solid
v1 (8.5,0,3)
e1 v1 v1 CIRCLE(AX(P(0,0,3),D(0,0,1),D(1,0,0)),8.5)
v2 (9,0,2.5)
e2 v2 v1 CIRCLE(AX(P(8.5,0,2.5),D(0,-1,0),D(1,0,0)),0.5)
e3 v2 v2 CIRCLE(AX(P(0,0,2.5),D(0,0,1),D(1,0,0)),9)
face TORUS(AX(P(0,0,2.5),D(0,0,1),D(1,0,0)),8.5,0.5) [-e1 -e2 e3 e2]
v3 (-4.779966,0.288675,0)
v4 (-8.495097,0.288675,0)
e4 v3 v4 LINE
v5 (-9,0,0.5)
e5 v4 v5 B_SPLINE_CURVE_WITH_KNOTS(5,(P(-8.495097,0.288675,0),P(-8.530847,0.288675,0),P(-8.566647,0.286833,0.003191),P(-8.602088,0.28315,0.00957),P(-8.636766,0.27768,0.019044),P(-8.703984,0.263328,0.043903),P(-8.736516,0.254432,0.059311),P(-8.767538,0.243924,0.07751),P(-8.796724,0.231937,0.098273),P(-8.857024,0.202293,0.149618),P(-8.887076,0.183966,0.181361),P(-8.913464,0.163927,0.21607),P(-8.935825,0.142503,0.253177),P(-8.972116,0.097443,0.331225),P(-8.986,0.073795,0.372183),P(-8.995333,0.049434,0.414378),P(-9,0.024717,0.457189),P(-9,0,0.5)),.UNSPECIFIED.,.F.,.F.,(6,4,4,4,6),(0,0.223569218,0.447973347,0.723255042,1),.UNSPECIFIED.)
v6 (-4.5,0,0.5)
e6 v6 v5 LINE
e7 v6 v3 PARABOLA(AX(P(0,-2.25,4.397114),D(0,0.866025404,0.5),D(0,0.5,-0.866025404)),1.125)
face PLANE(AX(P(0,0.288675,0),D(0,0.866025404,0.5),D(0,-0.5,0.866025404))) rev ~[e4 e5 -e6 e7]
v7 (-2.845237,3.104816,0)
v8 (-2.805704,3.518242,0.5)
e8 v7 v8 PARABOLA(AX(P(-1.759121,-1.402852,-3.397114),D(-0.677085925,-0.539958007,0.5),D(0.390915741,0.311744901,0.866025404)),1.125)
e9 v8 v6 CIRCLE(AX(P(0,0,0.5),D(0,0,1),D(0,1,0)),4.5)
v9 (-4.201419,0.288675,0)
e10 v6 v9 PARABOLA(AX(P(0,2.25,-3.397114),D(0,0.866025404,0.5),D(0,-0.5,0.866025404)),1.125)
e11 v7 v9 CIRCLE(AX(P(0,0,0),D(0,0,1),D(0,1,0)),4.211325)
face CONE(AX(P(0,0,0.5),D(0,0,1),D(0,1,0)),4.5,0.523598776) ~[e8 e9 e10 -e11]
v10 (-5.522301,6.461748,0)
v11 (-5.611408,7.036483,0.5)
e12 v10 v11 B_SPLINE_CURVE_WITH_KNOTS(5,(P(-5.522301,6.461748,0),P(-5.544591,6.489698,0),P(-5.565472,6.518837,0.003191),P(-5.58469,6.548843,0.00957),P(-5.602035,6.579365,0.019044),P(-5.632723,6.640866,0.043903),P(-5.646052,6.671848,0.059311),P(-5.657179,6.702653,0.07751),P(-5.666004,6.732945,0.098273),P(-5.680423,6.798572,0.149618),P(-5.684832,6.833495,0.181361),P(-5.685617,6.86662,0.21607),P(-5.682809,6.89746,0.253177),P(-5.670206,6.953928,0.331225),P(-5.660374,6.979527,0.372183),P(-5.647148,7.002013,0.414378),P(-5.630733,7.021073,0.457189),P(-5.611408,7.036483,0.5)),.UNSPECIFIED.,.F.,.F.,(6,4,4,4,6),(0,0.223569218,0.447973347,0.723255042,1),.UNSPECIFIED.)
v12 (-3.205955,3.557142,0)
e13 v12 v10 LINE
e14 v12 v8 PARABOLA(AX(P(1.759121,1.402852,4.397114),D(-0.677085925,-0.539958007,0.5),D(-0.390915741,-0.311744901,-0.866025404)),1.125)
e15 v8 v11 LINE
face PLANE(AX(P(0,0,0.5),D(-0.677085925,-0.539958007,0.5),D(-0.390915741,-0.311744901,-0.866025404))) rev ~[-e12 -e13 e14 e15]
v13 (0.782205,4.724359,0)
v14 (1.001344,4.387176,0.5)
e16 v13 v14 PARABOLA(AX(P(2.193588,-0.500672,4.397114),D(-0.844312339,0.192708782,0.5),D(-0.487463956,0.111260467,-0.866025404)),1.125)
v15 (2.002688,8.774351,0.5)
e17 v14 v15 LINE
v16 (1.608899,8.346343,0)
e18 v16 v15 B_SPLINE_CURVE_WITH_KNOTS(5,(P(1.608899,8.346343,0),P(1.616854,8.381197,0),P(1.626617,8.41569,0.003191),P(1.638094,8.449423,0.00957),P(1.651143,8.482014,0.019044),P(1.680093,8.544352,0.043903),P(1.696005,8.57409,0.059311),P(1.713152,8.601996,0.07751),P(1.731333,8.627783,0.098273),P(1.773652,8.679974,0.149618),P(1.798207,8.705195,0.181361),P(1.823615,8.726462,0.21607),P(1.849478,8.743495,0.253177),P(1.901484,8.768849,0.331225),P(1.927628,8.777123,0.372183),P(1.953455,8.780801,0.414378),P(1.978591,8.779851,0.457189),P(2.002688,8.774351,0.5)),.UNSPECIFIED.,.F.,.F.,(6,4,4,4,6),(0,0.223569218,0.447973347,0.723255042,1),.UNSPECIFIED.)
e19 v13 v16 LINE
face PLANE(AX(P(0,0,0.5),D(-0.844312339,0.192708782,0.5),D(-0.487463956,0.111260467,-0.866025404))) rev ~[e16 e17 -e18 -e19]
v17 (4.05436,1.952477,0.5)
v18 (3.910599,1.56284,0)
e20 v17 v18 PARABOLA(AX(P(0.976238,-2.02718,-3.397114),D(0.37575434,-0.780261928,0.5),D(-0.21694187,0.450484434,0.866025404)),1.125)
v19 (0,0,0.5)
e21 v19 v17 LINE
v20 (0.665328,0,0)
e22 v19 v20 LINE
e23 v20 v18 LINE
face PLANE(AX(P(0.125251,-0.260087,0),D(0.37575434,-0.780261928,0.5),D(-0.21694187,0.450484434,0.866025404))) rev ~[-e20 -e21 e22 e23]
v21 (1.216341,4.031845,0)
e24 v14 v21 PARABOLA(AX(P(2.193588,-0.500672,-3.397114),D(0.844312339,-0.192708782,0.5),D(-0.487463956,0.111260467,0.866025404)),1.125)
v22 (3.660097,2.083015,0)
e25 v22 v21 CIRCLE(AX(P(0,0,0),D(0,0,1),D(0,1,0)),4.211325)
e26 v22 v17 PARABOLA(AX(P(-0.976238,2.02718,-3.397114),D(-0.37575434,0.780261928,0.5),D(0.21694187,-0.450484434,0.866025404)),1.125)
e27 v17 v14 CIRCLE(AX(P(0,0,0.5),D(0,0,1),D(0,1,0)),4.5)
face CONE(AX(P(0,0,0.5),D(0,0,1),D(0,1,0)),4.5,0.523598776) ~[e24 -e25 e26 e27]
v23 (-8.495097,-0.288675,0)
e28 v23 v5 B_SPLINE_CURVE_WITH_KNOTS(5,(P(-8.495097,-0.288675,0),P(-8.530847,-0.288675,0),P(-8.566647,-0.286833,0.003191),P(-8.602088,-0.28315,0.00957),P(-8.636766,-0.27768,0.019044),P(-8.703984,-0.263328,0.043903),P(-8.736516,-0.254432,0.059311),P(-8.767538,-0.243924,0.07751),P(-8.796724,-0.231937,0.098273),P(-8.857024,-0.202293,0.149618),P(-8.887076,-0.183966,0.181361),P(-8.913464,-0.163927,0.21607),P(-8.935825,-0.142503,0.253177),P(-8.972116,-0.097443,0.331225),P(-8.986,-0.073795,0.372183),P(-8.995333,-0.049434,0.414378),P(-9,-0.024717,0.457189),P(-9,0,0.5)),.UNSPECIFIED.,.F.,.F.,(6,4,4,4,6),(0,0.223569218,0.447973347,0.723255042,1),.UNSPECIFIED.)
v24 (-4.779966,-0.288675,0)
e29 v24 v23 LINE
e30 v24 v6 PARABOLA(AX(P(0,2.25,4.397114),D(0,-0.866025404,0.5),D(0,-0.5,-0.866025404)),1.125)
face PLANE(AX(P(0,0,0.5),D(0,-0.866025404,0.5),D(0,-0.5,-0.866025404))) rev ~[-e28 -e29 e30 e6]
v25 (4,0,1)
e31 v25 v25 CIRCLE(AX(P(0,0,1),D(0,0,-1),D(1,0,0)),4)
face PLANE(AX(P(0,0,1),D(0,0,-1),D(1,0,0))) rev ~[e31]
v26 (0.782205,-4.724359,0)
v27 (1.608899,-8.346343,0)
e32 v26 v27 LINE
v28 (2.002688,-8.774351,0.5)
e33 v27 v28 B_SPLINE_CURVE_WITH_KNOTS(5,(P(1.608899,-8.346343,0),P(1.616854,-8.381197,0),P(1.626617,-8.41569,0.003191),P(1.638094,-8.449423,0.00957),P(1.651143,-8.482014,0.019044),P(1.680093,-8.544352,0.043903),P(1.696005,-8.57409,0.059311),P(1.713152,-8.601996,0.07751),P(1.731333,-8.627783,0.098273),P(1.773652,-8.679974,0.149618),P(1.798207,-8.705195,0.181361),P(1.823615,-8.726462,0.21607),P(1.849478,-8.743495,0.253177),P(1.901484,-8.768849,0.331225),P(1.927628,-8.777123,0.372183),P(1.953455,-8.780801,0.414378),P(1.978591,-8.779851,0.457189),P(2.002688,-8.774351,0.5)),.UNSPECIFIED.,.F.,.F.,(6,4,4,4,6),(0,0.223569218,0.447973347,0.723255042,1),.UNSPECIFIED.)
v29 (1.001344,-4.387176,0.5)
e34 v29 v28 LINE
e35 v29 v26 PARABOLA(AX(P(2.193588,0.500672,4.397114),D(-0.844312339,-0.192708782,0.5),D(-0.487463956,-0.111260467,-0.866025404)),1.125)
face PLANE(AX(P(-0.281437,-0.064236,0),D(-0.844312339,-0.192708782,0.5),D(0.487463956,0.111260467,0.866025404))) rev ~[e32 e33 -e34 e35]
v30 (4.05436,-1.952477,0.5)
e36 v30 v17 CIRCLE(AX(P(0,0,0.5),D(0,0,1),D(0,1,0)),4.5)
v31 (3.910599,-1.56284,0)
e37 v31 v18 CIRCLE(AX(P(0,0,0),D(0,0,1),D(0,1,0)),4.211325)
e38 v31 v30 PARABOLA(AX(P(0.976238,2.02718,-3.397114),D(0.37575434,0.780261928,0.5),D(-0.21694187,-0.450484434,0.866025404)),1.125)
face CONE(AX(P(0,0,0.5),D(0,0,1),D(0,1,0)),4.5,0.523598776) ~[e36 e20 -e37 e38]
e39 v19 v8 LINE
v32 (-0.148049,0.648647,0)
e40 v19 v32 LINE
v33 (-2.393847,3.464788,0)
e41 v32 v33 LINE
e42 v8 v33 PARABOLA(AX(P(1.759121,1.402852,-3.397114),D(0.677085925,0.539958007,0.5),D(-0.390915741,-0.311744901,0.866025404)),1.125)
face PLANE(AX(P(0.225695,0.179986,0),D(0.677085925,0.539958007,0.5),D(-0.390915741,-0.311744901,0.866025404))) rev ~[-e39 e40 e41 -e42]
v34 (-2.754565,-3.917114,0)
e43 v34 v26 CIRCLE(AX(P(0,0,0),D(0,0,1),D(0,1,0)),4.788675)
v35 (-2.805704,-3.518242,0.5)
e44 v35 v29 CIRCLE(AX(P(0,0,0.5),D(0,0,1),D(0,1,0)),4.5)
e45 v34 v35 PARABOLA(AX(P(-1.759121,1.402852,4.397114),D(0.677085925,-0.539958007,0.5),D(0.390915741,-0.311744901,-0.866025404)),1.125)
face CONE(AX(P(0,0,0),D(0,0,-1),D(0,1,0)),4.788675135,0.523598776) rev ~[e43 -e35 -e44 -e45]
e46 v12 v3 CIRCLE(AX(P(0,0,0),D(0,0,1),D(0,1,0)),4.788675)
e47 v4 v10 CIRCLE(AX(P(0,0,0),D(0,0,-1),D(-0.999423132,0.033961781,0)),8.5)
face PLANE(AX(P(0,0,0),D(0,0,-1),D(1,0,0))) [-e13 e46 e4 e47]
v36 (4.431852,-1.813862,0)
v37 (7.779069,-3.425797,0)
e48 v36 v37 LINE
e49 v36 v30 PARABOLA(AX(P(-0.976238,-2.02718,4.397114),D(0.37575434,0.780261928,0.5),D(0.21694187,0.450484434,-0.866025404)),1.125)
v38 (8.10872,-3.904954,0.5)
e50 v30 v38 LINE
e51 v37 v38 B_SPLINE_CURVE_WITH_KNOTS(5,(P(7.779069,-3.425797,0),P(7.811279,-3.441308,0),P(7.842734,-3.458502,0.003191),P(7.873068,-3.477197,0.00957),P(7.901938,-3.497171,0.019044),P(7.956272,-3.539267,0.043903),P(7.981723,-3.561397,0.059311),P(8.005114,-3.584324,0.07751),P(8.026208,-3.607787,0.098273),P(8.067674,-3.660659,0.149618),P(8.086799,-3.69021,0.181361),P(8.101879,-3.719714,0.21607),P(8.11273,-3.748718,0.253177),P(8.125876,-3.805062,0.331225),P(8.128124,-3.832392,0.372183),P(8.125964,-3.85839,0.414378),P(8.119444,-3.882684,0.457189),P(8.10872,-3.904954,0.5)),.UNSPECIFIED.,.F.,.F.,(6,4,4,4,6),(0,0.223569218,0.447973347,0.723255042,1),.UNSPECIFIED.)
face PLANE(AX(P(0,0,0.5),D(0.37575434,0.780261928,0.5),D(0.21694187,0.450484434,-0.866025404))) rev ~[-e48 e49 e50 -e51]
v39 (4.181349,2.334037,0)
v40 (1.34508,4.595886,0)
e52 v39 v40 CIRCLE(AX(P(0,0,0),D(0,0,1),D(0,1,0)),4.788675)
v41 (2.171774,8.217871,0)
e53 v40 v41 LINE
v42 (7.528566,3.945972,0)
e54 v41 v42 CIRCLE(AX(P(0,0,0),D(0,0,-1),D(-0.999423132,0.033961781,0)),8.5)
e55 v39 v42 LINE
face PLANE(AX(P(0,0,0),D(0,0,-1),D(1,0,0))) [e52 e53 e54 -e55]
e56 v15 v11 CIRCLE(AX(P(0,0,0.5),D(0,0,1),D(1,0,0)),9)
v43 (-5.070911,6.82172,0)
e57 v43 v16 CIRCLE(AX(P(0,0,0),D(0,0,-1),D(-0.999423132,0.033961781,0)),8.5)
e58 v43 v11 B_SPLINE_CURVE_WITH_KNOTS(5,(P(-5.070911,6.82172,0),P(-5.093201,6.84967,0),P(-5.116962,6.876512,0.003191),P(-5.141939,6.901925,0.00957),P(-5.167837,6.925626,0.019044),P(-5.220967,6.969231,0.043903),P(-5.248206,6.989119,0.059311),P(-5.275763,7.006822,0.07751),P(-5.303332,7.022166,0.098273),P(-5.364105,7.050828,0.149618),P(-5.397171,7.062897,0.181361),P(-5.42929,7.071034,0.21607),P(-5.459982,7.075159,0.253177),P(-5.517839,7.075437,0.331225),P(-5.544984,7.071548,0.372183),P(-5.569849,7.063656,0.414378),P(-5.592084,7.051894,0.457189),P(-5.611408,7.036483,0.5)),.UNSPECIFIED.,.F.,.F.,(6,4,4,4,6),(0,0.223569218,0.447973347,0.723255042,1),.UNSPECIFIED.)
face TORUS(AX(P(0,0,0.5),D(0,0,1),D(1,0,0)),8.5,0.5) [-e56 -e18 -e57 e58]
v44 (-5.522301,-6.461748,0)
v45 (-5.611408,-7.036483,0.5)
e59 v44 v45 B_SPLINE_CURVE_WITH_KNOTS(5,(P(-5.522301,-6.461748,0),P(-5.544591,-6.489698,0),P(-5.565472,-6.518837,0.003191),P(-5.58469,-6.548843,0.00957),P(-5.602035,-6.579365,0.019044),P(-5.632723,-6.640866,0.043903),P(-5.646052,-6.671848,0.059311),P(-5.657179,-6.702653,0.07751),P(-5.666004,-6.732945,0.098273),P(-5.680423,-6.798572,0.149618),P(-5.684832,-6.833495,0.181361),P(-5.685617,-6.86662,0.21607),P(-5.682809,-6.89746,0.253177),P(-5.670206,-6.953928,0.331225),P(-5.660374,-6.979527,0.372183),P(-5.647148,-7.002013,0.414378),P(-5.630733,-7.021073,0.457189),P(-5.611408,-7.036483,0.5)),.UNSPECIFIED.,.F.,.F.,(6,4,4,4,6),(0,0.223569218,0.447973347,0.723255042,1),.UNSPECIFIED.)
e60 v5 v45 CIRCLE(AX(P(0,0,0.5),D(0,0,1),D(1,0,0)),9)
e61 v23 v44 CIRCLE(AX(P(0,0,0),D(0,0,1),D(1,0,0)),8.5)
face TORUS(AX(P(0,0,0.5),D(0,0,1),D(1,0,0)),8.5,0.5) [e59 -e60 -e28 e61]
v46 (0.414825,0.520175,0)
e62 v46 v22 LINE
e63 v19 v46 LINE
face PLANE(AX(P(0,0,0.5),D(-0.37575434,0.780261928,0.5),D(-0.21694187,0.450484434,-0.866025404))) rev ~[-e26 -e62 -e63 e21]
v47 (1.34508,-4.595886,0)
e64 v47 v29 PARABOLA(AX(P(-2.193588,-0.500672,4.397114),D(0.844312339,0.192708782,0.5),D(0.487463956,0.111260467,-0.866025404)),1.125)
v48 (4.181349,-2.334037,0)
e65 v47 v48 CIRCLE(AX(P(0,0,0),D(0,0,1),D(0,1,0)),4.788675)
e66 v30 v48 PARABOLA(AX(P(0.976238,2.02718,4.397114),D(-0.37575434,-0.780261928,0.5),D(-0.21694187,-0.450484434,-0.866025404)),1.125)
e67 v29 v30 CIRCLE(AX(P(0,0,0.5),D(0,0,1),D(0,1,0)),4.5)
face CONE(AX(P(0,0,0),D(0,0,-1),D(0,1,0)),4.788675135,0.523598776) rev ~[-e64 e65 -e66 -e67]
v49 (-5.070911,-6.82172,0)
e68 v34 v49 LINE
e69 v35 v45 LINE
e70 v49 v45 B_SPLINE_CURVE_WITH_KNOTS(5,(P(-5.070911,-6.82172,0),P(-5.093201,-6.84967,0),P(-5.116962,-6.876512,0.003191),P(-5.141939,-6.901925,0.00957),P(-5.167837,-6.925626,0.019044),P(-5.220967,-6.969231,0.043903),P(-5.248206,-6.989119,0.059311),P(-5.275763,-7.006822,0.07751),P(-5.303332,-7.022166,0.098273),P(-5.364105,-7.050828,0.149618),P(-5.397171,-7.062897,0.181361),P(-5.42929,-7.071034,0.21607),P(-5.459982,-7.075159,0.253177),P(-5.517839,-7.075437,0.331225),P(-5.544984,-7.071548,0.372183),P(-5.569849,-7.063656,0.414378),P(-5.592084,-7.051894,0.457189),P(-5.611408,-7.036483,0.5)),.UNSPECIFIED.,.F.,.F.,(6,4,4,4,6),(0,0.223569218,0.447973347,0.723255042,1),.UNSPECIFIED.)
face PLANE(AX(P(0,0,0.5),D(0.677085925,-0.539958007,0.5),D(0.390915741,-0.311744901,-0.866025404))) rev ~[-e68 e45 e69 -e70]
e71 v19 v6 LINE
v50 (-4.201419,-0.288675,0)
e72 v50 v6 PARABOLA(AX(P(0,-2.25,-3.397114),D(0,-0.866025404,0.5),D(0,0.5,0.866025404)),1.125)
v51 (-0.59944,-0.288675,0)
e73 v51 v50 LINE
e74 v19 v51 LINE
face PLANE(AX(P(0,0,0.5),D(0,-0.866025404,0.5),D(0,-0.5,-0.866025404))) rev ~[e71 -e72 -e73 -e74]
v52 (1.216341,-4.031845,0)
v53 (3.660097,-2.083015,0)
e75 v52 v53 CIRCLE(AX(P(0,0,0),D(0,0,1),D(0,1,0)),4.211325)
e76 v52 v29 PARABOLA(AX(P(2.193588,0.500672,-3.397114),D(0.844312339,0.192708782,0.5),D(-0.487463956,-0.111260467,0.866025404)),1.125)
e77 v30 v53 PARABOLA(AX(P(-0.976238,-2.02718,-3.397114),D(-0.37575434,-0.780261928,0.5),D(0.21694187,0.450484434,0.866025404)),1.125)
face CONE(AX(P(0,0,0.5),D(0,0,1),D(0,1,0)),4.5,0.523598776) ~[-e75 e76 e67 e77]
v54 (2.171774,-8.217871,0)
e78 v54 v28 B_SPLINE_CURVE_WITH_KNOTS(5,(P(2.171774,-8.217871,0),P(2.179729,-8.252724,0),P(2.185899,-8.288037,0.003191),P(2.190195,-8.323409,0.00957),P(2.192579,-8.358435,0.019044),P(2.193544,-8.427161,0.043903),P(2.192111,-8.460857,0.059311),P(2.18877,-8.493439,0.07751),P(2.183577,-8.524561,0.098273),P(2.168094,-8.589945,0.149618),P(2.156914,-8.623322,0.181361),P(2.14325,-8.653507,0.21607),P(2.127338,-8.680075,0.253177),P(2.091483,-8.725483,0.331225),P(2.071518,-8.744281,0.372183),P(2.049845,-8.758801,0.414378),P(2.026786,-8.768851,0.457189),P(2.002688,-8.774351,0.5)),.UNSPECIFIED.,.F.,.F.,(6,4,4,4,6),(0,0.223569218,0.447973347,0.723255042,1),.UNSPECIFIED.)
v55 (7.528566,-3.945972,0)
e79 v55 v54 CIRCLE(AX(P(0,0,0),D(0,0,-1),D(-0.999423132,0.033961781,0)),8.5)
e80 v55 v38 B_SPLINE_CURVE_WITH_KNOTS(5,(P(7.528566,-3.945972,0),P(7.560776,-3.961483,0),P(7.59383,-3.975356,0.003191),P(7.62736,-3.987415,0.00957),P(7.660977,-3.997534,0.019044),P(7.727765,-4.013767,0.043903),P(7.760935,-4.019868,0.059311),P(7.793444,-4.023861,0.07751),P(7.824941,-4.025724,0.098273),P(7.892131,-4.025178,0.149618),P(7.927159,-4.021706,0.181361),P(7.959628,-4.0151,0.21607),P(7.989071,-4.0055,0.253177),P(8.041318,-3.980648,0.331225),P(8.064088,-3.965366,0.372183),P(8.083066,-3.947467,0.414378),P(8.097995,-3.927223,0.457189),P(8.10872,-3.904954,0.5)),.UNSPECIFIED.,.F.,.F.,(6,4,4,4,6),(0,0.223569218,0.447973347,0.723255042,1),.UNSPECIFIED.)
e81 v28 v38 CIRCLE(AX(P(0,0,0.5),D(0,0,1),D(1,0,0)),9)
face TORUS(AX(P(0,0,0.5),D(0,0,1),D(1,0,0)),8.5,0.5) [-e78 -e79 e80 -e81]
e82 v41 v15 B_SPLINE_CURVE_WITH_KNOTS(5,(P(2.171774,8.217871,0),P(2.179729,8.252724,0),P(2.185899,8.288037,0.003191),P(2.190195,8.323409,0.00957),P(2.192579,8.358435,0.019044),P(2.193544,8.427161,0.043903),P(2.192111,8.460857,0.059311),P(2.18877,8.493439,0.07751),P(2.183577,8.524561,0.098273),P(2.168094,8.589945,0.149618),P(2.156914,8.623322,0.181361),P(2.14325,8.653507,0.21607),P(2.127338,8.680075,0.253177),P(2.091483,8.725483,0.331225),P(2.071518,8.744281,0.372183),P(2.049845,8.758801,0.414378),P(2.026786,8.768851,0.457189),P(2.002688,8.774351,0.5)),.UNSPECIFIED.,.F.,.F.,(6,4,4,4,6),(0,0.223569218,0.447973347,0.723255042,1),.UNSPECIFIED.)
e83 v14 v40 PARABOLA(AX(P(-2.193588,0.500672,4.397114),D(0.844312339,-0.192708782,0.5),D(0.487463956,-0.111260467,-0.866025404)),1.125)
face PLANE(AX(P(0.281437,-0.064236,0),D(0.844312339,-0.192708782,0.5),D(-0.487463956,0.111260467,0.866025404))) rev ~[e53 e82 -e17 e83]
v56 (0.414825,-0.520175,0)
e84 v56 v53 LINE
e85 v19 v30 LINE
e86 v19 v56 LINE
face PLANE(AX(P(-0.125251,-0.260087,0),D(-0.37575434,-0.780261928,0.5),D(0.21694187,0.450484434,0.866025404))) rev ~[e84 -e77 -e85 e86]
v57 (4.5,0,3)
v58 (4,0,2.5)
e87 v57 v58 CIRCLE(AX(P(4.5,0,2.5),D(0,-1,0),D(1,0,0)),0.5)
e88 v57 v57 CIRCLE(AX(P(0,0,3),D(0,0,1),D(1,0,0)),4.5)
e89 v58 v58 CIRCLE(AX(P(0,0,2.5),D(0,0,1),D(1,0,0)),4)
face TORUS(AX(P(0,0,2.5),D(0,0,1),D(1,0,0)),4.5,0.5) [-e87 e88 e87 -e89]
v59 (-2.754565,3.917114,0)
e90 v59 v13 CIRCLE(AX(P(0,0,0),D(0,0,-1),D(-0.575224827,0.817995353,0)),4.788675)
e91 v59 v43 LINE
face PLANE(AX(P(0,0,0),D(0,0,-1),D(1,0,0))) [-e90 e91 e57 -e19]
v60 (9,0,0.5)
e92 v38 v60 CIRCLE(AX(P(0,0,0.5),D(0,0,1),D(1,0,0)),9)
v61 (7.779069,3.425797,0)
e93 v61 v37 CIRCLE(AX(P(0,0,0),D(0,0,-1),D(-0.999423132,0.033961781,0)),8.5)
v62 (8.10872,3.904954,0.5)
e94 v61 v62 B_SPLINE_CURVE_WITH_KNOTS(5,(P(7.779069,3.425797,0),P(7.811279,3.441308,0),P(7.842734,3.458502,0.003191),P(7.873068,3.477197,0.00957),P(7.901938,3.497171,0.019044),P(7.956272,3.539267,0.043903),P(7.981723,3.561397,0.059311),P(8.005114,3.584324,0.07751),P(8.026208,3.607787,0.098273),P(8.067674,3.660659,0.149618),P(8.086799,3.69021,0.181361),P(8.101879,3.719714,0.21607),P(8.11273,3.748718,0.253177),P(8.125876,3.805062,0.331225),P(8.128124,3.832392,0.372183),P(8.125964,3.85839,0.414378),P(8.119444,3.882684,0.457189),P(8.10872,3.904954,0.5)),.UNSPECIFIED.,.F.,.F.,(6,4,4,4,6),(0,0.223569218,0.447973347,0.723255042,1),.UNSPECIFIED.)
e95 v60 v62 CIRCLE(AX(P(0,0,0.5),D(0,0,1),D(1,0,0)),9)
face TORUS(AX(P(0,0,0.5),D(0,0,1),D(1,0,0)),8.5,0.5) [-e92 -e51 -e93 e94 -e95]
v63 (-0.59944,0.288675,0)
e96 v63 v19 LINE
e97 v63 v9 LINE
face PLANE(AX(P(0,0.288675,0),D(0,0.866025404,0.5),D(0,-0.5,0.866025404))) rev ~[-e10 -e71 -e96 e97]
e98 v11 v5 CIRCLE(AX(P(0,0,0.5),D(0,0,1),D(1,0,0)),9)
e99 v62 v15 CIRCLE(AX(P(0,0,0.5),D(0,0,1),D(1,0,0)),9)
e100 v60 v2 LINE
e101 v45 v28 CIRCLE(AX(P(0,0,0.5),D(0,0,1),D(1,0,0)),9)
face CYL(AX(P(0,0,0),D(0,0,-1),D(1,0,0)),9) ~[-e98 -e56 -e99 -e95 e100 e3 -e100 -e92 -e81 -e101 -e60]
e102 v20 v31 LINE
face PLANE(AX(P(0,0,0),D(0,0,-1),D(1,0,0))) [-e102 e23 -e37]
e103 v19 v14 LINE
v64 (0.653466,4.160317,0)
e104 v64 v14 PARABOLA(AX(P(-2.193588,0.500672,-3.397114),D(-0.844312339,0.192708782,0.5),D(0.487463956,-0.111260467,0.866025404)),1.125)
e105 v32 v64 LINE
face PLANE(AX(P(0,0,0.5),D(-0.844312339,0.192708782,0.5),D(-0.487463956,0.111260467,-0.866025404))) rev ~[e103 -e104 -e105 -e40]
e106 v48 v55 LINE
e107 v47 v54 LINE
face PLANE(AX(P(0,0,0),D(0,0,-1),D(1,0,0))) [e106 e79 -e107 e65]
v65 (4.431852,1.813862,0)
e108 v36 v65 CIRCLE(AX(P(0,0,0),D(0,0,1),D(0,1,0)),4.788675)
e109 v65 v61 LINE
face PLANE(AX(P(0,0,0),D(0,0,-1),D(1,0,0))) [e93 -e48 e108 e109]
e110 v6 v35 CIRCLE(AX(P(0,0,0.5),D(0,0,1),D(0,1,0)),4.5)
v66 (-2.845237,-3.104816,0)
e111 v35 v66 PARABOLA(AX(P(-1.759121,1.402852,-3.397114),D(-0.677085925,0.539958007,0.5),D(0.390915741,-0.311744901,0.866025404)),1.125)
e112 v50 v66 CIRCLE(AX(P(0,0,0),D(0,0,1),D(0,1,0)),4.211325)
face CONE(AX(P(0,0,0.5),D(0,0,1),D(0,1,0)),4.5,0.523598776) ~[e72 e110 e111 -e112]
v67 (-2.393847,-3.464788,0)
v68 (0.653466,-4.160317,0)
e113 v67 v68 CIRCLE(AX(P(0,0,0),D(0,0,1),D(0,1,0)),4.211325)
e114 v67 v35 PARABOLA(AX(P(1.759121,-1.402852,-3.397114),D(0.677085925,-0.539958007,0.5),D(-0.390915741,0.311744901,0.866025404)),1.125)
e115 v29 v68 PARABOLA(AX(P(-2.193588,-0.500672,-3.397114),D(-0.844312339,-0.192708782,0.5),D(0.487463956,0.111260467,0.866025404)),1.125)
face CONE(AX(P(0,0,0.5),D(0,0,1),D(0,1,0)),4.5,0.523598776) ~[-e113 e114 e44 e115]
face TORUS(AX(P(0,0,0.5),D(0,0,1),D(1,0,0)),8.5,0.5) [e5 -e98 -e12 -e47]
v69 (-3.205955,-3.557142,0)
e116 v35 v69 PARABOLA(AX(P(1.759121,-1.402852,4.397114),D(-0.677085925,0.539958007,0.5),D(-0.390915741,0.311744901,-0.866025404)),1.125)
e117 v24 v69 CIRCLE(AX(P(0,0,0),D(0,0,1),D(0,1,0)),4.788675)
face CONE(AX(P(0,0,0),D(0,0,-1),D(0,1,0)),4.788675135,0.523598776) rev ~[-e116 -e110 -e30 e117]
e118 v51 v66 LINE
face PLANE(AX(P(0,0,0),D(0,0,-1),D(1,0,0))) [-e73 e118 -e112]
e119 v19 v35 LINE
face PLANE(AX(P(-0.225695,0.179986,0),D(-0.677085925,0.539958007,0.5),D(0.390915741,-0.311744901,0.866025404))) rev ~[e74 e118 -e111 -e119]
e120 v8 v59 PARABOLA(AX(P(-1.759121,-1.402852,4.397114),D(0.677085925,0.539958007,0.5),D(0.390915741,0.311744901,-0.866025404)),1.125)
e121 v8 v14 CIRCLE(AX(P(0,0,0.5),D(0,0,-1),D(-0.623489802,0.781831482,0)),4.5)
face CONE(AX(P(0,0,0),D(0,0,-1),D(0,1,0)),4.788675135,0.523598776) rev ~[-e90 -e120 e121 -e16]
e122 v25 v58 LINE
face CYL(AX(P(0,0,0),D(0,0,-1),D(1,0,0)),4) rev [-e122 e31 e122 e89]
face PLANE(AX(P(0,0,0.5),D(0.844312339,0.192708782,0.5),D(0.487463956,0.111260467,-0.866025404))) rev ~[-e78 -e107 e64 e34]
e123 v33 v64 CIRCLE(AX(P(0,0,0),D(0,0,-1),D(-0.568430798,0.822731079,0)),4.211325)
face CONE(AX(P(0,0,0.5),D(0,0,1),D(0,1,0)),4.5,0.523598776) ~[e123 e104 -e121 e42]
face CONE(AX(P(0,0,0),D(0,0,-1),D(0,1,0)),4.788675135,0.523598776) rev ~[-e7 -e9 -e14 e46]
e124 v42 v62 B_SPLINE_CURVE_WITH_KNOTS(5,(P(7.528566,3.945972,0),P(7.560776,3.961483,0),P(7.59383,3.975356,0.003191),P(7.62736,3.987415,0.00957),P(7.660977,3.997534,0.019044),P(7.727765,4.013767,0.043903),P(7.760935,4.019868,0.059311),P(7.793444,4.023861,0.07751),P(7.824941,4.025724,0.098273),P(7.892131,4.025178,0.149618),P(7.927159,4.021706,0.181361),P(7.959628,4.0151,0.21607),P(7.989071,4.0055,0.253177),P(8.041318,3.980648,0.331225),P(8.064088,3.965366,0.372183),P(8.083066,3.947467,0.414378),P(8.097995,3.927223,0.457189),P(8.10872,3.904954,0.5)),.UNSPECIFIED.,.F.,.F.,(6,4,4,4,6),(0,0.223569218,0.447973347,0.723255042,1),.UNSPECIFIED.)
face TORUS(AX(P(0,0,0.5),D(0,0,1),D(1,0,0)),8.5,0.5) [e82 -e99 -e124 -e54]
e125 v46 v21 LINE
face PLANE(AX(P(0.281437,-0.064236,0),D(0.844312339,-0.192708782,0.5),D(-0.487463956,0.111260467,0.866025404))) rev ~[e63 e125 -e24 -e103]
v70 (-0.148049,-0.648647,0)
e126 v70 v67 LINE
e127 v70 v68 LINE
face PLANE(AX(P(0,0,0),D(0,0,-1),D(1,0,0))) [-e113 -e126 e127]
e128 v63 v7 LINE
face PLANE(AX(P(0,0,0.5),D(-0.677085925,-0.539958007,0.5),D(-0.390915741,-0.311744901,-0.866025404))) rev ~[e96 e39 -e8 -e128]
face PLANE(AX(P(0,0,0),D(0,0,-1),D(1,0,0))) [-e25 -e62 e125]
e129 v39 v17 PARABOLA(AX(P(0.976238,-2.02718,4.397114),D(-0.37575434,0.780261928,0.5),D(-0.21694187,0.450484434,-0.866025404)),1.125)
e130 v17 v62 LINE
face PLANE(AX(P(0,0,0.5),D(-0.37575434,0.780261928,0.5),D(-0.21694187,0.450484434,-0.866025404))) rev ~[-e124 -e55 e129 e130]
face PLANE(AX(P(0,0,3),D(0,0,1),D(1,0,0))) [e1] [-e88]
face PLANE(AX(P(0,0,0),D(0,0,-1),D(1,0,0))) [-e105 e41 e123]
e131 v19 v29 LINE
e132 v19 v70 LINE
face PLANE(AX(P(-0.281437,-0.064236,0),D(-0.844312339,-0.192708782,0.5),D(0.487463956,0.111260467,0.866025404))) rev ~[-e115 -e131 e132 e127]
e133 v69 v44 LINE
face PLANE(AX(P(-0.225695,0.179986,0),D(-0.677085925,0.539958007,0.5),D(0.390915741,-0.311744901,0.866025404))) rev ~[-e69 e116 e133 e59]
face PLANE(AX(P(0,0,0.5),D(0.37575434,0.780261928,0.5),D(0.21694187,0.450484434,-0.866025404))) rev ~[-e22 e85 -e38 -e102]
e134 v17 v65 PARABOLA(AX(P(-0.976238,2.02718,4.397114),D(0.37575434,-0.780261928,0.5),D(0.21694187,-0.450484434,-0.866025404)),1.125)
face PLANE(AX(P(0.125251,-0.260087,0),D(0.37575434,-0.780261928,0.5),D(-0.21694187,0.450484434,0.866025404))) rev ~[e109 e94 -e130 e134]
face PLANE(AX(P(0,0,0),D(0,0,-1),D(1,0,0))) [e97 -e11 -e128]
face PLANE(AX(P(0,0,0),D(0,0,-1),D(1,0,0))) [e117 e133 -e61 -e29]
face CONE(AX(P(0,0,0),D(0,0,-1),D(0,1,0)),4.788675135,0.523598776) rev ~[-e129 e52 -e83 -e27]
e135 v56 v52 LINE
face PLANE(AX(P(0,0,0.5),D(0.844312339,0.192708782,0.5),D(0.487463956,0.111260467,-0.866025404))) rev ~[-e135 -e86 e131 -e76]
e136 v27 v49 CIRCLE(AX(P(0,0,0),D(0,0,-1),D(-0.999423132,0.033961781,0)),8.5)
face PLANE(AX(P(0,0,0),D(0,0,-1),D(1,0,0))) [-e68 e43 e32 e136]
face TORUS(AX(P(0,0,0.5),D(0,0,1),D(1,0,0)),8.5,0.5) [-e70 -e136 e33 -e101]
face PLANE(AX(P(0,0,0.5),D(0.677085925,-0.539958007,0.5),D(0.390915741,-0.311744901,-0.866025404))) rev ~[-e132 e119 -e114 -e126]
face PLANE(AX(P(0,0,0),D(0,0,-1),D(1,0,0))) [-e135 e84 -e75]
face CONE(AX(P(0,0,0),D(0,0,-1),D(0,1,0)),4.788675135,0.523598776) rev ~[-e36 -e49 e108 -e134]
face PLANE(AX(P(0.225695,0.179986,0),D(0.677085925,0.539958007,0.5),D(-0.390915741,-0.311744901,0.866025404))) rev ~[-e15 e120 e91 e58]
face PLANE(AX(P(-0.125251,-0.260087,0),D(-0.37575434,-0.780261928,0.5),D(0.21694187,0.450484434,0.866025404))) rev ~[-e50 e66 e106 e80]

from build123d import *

# Parameters (mm, degrees)
F0_R            = 9
F0_R_2          = 4
F1_DEPTH        = 3
F2_R            = 4
F3_DEPTH        = 1
F4_R            = 0.5
F6_DEPTH        = 9.001
F6_COPIES_COUNT = 7
F10_R           = 0.5


# Not quite as in the source:
# - a pattern or mirror of a feature is missing from the dataset's text; its kind, count and spacing are read off the source's solid


with BuildPart() as f1:
    # F0 (on Top) → F1 (new body)
    with BuildSketch(Plane.XY):
        Circle(F0_R)
        Circle(F0_R_2, mode=Mode.SUBTRACT)
    extrude(amount=F1_DEPTH)

    # F2 (on face) → F3 (join)
    with BuildSketch(Plane(origin=(0, 0, 0), x_dir=(1, 0, 0), z_dir=(0, 0, -1))):
        Circle(F2_R)
    extrude(amount=-F3_DEPTH)

    # F4
    f4_edges = [f1.edges().sort_by_distance(p)[0] for p in [
        (-9, 0, 0),
        (-9, 0, 3),
    ]]
    fillet(f4_edges, radius=F4_R)

    # F5 (on Right) → F6 (cut, through all)
    with BuildSketch(Plane.YZ):
        Polygon((-0.2886751346, 0), (0.2886751346, 0), (0, 0.5), align=None)
    f6 = extrude(amount=-F6_DEPTH, mode=Mode.SUBTRACT)

    # F6_copies: F6 ×7 about axis
    f6_copies_axis = Axis((0, 0, 0), (0, 0, 1))
    for i in range(1, F6_COPIES_COUNT):
        add(f6.rotate(f6_copies_axis, i * 360 / F6_COPIES_COUNT), mode=Mode.SUBTRACT)

    # F7 (on Right) → F9 (revolve, cut)
    with BuildSketch(Plane.YZ):
        Polygon((4.5, 0.5), (4.2113248654, 0), (4.7886751346, 0), align=None)
    revolve(axis=Axis((0, 0, 0.5049179308), (0, 0, 1)), mode=Mode.SUBTRACT)

    # F10
    f10_edges = [f1.edges().sort_by_distance(p)[0] for p in [
        (-4, 0, 3),
    ]]
    fillet(f10_edges, radius=F10_R)


solid = f1.part
